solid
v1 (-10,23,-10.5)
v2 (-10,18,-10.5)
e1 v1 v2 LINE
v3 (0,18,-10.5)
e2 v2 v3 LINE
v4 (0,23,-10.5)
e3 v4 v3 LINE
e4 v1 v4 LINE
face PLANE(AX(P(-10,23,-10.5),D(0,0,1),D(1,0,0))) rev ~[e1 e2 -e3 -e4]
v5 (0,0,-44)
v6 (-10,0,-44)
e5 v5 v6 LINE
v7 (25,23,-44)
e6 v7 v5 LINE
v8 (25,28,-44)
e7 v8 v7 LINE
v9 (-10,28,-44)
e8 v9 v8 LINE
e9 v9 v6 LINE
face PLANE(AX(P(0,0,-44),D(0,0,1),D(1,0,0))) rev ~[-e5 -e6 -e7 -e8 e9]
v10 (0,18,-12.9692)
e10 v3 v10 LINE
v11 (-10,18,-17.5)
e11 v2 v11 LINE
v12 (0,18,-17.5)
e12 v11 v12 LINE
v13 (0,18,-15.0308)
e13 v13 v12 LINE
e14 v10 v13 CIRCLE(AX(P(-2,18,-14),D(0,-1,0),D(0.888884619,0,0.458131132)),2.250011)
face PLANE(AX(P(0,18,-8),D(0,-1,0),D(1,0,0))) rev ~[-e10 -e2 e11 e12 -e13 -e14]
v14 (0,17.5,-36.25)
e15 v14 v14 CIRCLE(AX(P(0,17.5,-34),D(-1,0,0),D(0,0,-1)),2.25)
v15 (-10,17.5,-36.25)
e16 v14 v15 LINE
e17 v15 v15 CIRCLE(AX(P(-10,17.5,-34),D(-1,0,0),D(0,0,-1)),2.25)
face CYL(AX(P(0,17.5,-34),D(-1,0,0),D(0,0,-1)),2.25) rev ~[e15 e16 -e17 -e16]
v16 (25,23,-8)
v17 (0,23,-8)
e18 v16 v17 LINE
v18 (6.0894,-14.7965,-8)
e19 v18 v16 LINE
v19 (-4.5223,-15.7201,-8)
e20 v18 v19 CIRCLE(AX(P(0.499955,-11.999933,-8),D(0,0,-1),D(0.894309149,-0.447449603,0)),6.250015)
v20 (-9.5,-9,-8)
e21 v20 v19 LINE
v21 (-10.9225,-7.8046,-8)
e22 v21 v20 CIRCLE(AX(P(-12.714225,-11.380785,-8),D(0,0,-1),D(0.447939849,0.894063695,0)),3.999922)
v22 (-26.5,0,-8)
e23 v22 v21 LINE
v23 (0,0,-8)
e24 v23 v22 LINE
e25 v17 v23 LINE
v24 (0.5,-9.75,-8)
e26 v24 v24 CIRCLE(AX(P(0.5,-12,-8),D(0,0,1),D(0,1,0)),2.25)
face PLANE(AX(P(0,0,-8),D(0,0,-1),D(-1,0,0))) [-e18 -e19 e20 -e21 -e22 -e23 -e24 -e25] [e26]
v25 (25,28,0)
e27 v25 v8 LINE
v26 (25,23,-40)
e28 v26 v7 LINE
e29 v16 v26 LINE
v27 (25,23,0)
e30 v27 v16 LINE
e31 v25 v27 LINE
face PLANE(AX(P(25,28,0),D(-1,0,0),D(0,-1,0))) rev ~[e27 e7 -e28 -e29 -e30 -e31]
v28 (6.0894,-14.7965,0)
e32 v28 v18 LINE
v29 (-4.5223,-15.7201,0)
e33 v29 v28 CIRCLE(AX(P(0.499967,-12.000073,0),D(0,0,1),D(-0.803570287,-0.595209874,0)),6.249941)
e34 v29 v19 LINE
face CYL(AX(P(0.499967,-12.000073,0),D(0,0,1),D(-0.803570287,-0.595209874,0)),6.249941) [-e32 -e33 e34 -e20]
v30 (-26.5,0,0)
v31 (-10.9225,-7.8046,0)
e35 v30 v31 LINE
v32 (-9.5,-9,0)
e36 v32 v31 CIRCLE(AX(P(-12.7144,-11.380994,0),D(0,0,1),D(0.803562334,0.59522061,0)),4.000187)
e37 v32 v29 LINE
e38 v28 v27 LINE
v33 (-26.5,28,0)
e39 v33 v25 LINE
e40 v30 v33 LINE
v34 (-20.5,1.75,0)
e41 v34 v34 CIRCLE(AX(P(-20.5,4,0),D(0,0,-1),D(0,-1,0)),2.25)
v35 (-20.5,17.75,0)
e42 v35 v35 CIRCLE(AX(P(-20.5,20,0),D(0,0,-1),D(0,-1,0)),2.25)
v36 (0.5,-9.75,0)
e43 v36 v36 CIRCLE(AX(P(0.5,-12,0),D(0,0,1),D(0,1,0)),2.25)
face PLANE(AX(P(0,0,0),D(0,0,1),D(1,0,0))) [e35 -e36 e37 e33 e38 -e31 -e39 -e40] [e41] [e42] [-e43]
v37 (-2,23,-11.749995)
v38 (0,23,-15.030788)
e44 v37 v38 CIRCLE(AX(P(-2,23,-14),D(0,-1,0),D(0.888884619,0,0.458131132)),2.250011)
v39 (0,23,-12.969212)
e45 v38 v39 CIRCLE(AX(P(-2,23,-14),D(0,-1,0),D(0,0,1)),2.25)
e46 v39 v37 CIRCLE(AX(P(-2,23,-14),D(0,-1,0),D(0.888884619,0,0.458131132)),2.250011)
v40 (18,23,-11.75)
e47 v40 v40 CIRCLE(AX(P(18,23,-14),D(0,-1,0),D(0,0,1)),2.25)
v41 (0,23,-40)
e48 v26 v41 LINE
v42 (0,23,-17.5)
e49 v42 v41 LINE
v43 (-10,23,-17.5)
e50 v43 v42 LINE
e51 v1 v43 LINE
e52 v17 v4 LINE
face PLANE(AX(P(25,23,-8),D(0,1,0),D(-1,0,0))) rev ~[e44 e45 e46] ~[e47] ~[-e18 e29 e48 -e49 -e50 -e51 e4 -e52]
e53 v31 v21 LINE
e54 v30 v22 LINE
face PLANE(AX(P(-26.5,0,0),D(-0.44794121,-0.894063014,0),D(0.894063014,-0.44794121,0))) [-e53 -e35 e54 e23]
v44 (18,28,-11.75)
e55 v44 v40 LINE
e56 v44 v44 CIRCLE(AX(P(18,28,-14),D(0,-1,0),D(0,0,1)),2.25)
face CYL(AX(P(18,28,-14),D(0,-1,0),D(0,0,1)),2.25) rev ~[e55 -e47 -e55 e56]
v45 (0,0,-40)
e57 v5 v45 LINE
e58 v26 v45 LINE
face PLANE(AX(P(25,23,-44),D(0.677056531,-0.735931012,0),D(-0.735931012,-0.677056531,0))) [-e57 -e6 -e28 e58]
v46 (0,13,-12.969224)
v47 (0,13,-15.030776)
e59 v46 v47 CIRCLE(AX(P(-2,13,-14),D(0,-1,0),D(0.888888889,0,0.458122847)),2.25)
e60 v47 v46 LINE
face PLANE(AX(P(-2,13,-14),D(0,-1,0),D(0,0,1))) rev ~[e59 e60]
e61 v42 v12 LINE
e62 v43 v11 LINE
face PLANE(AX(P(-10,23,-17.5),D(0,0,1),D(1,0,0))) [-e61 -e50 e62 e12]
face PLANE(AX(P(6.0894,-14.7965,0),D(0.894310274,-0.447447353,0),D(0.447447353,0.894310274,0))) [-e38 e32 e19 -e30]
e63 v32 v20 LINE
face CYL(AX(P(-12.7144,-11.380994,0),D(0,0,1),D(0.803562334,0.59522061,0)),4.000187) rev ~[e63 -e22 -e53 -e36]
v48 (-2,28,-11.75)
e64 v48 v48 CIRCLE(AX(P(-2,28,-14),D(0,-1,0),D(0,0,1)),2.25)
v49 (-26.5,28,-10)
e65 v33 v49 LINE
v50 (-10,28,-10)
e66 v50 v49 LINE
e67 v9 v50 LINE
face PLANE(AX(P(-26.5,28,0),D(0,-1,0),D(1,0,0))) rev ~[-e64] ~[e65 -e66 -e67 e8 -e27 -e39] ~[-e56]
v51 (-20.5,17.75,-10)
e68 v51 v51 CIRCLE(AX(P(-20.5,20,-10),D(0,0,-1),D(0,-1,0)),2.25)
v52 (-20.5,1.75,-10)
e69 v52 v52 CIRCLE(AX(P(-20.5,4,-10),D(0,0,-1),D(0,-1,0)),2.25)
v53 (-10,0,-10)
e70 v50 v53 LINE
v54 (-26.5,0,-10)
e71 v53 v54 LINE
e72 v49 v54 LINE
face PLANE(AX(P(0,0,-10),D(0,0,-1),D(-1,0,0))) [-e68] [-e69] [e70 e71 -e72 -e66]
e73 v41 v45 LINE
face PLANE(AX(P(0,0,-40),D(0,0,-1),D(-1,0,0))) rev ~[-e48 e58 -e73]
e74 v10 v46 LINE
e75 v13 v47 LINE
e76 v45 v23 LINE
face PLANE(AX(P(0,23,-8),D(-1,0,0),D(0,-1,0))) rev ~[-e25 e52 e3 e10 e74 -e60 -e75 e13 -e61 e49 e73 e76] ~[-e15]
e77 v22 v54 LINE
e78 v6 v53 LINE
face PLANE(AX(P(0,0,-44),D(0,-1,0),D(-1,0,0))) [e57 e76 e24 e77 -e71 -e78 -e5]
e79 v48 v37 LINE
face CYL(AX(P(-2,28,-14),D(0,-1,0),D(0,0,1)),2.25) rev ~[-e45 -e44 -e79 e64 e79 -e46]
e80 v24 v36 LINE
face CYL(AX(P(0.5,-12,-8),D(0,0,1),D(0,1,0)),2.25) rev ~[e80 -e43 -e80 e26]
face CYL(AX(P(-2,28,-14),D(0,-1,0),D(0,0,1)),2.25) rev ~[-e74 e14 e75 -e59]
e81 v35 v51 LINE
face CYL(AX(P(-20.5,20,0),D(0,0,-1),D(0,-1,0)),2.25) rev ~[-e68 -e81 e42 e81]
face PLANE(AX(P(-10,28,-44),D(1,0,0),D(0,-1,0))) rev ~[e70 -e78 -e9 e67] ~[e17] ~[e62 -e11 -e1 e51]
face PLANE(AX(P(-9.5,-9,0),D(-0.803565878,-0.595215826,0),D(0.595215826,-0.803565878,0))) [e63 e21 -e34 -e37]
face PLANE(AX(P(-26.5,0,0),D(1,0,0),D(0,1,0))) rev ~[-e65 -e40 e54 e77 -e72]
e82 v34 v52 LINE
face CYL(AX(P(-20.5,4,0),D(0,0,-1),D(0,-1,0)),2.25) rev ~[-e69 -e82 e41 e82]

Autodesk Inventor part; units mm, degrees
ref_plane "YZ Plane" through (0, 0, 0) normal (1, 0, 0) x (0, 1, 0)
ref_plane "XZ Plane" through (0, 0, 0) normal (0, 1, 0) x (-1, 0, 0)
ref_plane "XY Plane" through (0, 0, 0) normal (0, 0, 1) x (1, 0, 0)
sketch "Sketch1" plane through (0, 0, 0) normal (0, 0, 1) x (1, 0, 0)
  line L0 (-26.5, 28) -> (25, 28)
  line L1 (-26.5, 0) -> (-26.5, 28)
  line L2 (25, 28) -> (25, 23)
  arc A0 (-9.5, -9) -> (-10.9225, -7.8046) centre (-12.7143, -11.3809) ccw
  line L3 (-26.5, 0) -> (-10.9225, -7.8046)
  line L4 (-9.5, -9) -> (-4.5223, -15.7201)
  arc A1 (-4.5223, -15.7201) -> (6.0894, -14.7965) centre (0.5, -12) ccw
  line L5 (6.0894, -14.7965) -> (25, 23)
extrude "Extrusion5" add sketch "Sketch1" against normal blind 44
sketch "Sketch2" plane through (0, 0, -44) normal (0, 0, -1) x (-1, 0, 0)
  line L0 (26.5, 0) -> (10.9225, -7.8046)
  arc A0 (-6.0894, -14.7965) -> (4.5223, -15.7201) centre (-0.5, -12) ccw
  line L1 (-25, 23) -> (0, 0)
  arc A1 (10.9225, -7.8046) -> (9.5, -9) centre (12.7143, -11.3809) ccw
  line L2 (-6.0894, -14.7965) -> (-25, 23)
  line L3 (0, 0) -> (26.5, 0)
  line L4 (9.5, -9) -> (4.5223, -15.7201)
extrude "Extrusion4" cut sketch "Sketch2" against normal blind 36
sketch "Sketch3" plane through (0, 0, -8) normal (0, 0, -1) x (-1, 0, 0)
  line L0 (0, 23) -> (0, 0)
  line L1 (-25, 23) -> (0, 23)
  line L2 (-25, 23) -> (0, 0)
extrude "Extrusion3" cut sketch "Sketch3" along normal blind 32
sketch "Sketch4" plane through (0, 0, -44) normal (0, 0, -1) x (-1, 0, 0)
  line L0 (10, 28) -> (10, 0)
  line L1 (10, 0) -> (26.5, 0)
  line L2 (10, 28) -> (26.5, 28)
  line L3 (26.5, 28) -> (26.5, 0)
extrude "Extrusion2" cut sketch "Sketch4" against normal blind 34 draft 0
hole "Hole6" at (-2, 28, -14) direction (0, -1, 0) diameter 4.5 depth 15
sketch "Sketch6" plane through (0, 23, -8) normal (0, -1, 0) x (1, 0, 0)
  line L0 (0, -2.5) -> (0, -4.9692)
  line L1 (-10, -9.5) -> (0, -9.5)
  line L2 (-10, -2.5) -> (0, -2.5)
  line L3 (0, -7.0308) -> (0, -9.5)
  arc A0 (0, -4.9692) -> (0, -7.0308) centre (-2, -6) ccw
  line L4 (-10, -2.5) -> (-10, -9.5)
extrude "Extrusion1" cut sketch "Sketch6" along normal blind 5
hole "Hole5" at (18, 28, -14) direction (0, -1, 0) diameter 4.5 depth 5
hole "Hole4" at (0, 17.5, -34) direction (-1, 0, 0) diameter 4.5 depth 10
sketch "Sketch8" plane through (0, 0, 0) normal (1, 0, 0) x (0, 1, 0)
  point P0 (17.5, -34)
hole "Hole3" at (0.5, -12, -8) direction (0, 0, 1) diameter 4.5 depth 8
sketch "Sketch7" plane through (-26.5, 28, 0) normal (0, 1, 0) x (1, 0, 0)
  point P0 (44.5, 14)
hole "Hole2" at (-20.5, 4, 0) direction (0, 0, -1) diameter 4.5 depth 10
sketch "Sketch5" plane through (-26.5, 28, 0) normal (0, 1, 0) x (1, 0, 0)
  point P0 (24.5, 14)
hole "Hole1" at (-20.5, 20, 0) direction (0, 0, -1) diameter 4.5 depth 10
sketch "Sketch9" plane through (0, 0, -8) normal (0, 0, -1) x (-1, 0, 0)
  point P0 (-0.5, -12)
sketch "Sketch10" plane through (0, 0, 0) normal (0, 0, 1) x (1, 0, 0)
  point P0 (-20.5, 4)
sketch "Sketch11" plane through (0, 0, 0) normal (0, 0, 1) x (1, 0, 0)
  point P0 (-20.5, 20)
properties part number "Hopper Idler" material "ASA Plastic"
